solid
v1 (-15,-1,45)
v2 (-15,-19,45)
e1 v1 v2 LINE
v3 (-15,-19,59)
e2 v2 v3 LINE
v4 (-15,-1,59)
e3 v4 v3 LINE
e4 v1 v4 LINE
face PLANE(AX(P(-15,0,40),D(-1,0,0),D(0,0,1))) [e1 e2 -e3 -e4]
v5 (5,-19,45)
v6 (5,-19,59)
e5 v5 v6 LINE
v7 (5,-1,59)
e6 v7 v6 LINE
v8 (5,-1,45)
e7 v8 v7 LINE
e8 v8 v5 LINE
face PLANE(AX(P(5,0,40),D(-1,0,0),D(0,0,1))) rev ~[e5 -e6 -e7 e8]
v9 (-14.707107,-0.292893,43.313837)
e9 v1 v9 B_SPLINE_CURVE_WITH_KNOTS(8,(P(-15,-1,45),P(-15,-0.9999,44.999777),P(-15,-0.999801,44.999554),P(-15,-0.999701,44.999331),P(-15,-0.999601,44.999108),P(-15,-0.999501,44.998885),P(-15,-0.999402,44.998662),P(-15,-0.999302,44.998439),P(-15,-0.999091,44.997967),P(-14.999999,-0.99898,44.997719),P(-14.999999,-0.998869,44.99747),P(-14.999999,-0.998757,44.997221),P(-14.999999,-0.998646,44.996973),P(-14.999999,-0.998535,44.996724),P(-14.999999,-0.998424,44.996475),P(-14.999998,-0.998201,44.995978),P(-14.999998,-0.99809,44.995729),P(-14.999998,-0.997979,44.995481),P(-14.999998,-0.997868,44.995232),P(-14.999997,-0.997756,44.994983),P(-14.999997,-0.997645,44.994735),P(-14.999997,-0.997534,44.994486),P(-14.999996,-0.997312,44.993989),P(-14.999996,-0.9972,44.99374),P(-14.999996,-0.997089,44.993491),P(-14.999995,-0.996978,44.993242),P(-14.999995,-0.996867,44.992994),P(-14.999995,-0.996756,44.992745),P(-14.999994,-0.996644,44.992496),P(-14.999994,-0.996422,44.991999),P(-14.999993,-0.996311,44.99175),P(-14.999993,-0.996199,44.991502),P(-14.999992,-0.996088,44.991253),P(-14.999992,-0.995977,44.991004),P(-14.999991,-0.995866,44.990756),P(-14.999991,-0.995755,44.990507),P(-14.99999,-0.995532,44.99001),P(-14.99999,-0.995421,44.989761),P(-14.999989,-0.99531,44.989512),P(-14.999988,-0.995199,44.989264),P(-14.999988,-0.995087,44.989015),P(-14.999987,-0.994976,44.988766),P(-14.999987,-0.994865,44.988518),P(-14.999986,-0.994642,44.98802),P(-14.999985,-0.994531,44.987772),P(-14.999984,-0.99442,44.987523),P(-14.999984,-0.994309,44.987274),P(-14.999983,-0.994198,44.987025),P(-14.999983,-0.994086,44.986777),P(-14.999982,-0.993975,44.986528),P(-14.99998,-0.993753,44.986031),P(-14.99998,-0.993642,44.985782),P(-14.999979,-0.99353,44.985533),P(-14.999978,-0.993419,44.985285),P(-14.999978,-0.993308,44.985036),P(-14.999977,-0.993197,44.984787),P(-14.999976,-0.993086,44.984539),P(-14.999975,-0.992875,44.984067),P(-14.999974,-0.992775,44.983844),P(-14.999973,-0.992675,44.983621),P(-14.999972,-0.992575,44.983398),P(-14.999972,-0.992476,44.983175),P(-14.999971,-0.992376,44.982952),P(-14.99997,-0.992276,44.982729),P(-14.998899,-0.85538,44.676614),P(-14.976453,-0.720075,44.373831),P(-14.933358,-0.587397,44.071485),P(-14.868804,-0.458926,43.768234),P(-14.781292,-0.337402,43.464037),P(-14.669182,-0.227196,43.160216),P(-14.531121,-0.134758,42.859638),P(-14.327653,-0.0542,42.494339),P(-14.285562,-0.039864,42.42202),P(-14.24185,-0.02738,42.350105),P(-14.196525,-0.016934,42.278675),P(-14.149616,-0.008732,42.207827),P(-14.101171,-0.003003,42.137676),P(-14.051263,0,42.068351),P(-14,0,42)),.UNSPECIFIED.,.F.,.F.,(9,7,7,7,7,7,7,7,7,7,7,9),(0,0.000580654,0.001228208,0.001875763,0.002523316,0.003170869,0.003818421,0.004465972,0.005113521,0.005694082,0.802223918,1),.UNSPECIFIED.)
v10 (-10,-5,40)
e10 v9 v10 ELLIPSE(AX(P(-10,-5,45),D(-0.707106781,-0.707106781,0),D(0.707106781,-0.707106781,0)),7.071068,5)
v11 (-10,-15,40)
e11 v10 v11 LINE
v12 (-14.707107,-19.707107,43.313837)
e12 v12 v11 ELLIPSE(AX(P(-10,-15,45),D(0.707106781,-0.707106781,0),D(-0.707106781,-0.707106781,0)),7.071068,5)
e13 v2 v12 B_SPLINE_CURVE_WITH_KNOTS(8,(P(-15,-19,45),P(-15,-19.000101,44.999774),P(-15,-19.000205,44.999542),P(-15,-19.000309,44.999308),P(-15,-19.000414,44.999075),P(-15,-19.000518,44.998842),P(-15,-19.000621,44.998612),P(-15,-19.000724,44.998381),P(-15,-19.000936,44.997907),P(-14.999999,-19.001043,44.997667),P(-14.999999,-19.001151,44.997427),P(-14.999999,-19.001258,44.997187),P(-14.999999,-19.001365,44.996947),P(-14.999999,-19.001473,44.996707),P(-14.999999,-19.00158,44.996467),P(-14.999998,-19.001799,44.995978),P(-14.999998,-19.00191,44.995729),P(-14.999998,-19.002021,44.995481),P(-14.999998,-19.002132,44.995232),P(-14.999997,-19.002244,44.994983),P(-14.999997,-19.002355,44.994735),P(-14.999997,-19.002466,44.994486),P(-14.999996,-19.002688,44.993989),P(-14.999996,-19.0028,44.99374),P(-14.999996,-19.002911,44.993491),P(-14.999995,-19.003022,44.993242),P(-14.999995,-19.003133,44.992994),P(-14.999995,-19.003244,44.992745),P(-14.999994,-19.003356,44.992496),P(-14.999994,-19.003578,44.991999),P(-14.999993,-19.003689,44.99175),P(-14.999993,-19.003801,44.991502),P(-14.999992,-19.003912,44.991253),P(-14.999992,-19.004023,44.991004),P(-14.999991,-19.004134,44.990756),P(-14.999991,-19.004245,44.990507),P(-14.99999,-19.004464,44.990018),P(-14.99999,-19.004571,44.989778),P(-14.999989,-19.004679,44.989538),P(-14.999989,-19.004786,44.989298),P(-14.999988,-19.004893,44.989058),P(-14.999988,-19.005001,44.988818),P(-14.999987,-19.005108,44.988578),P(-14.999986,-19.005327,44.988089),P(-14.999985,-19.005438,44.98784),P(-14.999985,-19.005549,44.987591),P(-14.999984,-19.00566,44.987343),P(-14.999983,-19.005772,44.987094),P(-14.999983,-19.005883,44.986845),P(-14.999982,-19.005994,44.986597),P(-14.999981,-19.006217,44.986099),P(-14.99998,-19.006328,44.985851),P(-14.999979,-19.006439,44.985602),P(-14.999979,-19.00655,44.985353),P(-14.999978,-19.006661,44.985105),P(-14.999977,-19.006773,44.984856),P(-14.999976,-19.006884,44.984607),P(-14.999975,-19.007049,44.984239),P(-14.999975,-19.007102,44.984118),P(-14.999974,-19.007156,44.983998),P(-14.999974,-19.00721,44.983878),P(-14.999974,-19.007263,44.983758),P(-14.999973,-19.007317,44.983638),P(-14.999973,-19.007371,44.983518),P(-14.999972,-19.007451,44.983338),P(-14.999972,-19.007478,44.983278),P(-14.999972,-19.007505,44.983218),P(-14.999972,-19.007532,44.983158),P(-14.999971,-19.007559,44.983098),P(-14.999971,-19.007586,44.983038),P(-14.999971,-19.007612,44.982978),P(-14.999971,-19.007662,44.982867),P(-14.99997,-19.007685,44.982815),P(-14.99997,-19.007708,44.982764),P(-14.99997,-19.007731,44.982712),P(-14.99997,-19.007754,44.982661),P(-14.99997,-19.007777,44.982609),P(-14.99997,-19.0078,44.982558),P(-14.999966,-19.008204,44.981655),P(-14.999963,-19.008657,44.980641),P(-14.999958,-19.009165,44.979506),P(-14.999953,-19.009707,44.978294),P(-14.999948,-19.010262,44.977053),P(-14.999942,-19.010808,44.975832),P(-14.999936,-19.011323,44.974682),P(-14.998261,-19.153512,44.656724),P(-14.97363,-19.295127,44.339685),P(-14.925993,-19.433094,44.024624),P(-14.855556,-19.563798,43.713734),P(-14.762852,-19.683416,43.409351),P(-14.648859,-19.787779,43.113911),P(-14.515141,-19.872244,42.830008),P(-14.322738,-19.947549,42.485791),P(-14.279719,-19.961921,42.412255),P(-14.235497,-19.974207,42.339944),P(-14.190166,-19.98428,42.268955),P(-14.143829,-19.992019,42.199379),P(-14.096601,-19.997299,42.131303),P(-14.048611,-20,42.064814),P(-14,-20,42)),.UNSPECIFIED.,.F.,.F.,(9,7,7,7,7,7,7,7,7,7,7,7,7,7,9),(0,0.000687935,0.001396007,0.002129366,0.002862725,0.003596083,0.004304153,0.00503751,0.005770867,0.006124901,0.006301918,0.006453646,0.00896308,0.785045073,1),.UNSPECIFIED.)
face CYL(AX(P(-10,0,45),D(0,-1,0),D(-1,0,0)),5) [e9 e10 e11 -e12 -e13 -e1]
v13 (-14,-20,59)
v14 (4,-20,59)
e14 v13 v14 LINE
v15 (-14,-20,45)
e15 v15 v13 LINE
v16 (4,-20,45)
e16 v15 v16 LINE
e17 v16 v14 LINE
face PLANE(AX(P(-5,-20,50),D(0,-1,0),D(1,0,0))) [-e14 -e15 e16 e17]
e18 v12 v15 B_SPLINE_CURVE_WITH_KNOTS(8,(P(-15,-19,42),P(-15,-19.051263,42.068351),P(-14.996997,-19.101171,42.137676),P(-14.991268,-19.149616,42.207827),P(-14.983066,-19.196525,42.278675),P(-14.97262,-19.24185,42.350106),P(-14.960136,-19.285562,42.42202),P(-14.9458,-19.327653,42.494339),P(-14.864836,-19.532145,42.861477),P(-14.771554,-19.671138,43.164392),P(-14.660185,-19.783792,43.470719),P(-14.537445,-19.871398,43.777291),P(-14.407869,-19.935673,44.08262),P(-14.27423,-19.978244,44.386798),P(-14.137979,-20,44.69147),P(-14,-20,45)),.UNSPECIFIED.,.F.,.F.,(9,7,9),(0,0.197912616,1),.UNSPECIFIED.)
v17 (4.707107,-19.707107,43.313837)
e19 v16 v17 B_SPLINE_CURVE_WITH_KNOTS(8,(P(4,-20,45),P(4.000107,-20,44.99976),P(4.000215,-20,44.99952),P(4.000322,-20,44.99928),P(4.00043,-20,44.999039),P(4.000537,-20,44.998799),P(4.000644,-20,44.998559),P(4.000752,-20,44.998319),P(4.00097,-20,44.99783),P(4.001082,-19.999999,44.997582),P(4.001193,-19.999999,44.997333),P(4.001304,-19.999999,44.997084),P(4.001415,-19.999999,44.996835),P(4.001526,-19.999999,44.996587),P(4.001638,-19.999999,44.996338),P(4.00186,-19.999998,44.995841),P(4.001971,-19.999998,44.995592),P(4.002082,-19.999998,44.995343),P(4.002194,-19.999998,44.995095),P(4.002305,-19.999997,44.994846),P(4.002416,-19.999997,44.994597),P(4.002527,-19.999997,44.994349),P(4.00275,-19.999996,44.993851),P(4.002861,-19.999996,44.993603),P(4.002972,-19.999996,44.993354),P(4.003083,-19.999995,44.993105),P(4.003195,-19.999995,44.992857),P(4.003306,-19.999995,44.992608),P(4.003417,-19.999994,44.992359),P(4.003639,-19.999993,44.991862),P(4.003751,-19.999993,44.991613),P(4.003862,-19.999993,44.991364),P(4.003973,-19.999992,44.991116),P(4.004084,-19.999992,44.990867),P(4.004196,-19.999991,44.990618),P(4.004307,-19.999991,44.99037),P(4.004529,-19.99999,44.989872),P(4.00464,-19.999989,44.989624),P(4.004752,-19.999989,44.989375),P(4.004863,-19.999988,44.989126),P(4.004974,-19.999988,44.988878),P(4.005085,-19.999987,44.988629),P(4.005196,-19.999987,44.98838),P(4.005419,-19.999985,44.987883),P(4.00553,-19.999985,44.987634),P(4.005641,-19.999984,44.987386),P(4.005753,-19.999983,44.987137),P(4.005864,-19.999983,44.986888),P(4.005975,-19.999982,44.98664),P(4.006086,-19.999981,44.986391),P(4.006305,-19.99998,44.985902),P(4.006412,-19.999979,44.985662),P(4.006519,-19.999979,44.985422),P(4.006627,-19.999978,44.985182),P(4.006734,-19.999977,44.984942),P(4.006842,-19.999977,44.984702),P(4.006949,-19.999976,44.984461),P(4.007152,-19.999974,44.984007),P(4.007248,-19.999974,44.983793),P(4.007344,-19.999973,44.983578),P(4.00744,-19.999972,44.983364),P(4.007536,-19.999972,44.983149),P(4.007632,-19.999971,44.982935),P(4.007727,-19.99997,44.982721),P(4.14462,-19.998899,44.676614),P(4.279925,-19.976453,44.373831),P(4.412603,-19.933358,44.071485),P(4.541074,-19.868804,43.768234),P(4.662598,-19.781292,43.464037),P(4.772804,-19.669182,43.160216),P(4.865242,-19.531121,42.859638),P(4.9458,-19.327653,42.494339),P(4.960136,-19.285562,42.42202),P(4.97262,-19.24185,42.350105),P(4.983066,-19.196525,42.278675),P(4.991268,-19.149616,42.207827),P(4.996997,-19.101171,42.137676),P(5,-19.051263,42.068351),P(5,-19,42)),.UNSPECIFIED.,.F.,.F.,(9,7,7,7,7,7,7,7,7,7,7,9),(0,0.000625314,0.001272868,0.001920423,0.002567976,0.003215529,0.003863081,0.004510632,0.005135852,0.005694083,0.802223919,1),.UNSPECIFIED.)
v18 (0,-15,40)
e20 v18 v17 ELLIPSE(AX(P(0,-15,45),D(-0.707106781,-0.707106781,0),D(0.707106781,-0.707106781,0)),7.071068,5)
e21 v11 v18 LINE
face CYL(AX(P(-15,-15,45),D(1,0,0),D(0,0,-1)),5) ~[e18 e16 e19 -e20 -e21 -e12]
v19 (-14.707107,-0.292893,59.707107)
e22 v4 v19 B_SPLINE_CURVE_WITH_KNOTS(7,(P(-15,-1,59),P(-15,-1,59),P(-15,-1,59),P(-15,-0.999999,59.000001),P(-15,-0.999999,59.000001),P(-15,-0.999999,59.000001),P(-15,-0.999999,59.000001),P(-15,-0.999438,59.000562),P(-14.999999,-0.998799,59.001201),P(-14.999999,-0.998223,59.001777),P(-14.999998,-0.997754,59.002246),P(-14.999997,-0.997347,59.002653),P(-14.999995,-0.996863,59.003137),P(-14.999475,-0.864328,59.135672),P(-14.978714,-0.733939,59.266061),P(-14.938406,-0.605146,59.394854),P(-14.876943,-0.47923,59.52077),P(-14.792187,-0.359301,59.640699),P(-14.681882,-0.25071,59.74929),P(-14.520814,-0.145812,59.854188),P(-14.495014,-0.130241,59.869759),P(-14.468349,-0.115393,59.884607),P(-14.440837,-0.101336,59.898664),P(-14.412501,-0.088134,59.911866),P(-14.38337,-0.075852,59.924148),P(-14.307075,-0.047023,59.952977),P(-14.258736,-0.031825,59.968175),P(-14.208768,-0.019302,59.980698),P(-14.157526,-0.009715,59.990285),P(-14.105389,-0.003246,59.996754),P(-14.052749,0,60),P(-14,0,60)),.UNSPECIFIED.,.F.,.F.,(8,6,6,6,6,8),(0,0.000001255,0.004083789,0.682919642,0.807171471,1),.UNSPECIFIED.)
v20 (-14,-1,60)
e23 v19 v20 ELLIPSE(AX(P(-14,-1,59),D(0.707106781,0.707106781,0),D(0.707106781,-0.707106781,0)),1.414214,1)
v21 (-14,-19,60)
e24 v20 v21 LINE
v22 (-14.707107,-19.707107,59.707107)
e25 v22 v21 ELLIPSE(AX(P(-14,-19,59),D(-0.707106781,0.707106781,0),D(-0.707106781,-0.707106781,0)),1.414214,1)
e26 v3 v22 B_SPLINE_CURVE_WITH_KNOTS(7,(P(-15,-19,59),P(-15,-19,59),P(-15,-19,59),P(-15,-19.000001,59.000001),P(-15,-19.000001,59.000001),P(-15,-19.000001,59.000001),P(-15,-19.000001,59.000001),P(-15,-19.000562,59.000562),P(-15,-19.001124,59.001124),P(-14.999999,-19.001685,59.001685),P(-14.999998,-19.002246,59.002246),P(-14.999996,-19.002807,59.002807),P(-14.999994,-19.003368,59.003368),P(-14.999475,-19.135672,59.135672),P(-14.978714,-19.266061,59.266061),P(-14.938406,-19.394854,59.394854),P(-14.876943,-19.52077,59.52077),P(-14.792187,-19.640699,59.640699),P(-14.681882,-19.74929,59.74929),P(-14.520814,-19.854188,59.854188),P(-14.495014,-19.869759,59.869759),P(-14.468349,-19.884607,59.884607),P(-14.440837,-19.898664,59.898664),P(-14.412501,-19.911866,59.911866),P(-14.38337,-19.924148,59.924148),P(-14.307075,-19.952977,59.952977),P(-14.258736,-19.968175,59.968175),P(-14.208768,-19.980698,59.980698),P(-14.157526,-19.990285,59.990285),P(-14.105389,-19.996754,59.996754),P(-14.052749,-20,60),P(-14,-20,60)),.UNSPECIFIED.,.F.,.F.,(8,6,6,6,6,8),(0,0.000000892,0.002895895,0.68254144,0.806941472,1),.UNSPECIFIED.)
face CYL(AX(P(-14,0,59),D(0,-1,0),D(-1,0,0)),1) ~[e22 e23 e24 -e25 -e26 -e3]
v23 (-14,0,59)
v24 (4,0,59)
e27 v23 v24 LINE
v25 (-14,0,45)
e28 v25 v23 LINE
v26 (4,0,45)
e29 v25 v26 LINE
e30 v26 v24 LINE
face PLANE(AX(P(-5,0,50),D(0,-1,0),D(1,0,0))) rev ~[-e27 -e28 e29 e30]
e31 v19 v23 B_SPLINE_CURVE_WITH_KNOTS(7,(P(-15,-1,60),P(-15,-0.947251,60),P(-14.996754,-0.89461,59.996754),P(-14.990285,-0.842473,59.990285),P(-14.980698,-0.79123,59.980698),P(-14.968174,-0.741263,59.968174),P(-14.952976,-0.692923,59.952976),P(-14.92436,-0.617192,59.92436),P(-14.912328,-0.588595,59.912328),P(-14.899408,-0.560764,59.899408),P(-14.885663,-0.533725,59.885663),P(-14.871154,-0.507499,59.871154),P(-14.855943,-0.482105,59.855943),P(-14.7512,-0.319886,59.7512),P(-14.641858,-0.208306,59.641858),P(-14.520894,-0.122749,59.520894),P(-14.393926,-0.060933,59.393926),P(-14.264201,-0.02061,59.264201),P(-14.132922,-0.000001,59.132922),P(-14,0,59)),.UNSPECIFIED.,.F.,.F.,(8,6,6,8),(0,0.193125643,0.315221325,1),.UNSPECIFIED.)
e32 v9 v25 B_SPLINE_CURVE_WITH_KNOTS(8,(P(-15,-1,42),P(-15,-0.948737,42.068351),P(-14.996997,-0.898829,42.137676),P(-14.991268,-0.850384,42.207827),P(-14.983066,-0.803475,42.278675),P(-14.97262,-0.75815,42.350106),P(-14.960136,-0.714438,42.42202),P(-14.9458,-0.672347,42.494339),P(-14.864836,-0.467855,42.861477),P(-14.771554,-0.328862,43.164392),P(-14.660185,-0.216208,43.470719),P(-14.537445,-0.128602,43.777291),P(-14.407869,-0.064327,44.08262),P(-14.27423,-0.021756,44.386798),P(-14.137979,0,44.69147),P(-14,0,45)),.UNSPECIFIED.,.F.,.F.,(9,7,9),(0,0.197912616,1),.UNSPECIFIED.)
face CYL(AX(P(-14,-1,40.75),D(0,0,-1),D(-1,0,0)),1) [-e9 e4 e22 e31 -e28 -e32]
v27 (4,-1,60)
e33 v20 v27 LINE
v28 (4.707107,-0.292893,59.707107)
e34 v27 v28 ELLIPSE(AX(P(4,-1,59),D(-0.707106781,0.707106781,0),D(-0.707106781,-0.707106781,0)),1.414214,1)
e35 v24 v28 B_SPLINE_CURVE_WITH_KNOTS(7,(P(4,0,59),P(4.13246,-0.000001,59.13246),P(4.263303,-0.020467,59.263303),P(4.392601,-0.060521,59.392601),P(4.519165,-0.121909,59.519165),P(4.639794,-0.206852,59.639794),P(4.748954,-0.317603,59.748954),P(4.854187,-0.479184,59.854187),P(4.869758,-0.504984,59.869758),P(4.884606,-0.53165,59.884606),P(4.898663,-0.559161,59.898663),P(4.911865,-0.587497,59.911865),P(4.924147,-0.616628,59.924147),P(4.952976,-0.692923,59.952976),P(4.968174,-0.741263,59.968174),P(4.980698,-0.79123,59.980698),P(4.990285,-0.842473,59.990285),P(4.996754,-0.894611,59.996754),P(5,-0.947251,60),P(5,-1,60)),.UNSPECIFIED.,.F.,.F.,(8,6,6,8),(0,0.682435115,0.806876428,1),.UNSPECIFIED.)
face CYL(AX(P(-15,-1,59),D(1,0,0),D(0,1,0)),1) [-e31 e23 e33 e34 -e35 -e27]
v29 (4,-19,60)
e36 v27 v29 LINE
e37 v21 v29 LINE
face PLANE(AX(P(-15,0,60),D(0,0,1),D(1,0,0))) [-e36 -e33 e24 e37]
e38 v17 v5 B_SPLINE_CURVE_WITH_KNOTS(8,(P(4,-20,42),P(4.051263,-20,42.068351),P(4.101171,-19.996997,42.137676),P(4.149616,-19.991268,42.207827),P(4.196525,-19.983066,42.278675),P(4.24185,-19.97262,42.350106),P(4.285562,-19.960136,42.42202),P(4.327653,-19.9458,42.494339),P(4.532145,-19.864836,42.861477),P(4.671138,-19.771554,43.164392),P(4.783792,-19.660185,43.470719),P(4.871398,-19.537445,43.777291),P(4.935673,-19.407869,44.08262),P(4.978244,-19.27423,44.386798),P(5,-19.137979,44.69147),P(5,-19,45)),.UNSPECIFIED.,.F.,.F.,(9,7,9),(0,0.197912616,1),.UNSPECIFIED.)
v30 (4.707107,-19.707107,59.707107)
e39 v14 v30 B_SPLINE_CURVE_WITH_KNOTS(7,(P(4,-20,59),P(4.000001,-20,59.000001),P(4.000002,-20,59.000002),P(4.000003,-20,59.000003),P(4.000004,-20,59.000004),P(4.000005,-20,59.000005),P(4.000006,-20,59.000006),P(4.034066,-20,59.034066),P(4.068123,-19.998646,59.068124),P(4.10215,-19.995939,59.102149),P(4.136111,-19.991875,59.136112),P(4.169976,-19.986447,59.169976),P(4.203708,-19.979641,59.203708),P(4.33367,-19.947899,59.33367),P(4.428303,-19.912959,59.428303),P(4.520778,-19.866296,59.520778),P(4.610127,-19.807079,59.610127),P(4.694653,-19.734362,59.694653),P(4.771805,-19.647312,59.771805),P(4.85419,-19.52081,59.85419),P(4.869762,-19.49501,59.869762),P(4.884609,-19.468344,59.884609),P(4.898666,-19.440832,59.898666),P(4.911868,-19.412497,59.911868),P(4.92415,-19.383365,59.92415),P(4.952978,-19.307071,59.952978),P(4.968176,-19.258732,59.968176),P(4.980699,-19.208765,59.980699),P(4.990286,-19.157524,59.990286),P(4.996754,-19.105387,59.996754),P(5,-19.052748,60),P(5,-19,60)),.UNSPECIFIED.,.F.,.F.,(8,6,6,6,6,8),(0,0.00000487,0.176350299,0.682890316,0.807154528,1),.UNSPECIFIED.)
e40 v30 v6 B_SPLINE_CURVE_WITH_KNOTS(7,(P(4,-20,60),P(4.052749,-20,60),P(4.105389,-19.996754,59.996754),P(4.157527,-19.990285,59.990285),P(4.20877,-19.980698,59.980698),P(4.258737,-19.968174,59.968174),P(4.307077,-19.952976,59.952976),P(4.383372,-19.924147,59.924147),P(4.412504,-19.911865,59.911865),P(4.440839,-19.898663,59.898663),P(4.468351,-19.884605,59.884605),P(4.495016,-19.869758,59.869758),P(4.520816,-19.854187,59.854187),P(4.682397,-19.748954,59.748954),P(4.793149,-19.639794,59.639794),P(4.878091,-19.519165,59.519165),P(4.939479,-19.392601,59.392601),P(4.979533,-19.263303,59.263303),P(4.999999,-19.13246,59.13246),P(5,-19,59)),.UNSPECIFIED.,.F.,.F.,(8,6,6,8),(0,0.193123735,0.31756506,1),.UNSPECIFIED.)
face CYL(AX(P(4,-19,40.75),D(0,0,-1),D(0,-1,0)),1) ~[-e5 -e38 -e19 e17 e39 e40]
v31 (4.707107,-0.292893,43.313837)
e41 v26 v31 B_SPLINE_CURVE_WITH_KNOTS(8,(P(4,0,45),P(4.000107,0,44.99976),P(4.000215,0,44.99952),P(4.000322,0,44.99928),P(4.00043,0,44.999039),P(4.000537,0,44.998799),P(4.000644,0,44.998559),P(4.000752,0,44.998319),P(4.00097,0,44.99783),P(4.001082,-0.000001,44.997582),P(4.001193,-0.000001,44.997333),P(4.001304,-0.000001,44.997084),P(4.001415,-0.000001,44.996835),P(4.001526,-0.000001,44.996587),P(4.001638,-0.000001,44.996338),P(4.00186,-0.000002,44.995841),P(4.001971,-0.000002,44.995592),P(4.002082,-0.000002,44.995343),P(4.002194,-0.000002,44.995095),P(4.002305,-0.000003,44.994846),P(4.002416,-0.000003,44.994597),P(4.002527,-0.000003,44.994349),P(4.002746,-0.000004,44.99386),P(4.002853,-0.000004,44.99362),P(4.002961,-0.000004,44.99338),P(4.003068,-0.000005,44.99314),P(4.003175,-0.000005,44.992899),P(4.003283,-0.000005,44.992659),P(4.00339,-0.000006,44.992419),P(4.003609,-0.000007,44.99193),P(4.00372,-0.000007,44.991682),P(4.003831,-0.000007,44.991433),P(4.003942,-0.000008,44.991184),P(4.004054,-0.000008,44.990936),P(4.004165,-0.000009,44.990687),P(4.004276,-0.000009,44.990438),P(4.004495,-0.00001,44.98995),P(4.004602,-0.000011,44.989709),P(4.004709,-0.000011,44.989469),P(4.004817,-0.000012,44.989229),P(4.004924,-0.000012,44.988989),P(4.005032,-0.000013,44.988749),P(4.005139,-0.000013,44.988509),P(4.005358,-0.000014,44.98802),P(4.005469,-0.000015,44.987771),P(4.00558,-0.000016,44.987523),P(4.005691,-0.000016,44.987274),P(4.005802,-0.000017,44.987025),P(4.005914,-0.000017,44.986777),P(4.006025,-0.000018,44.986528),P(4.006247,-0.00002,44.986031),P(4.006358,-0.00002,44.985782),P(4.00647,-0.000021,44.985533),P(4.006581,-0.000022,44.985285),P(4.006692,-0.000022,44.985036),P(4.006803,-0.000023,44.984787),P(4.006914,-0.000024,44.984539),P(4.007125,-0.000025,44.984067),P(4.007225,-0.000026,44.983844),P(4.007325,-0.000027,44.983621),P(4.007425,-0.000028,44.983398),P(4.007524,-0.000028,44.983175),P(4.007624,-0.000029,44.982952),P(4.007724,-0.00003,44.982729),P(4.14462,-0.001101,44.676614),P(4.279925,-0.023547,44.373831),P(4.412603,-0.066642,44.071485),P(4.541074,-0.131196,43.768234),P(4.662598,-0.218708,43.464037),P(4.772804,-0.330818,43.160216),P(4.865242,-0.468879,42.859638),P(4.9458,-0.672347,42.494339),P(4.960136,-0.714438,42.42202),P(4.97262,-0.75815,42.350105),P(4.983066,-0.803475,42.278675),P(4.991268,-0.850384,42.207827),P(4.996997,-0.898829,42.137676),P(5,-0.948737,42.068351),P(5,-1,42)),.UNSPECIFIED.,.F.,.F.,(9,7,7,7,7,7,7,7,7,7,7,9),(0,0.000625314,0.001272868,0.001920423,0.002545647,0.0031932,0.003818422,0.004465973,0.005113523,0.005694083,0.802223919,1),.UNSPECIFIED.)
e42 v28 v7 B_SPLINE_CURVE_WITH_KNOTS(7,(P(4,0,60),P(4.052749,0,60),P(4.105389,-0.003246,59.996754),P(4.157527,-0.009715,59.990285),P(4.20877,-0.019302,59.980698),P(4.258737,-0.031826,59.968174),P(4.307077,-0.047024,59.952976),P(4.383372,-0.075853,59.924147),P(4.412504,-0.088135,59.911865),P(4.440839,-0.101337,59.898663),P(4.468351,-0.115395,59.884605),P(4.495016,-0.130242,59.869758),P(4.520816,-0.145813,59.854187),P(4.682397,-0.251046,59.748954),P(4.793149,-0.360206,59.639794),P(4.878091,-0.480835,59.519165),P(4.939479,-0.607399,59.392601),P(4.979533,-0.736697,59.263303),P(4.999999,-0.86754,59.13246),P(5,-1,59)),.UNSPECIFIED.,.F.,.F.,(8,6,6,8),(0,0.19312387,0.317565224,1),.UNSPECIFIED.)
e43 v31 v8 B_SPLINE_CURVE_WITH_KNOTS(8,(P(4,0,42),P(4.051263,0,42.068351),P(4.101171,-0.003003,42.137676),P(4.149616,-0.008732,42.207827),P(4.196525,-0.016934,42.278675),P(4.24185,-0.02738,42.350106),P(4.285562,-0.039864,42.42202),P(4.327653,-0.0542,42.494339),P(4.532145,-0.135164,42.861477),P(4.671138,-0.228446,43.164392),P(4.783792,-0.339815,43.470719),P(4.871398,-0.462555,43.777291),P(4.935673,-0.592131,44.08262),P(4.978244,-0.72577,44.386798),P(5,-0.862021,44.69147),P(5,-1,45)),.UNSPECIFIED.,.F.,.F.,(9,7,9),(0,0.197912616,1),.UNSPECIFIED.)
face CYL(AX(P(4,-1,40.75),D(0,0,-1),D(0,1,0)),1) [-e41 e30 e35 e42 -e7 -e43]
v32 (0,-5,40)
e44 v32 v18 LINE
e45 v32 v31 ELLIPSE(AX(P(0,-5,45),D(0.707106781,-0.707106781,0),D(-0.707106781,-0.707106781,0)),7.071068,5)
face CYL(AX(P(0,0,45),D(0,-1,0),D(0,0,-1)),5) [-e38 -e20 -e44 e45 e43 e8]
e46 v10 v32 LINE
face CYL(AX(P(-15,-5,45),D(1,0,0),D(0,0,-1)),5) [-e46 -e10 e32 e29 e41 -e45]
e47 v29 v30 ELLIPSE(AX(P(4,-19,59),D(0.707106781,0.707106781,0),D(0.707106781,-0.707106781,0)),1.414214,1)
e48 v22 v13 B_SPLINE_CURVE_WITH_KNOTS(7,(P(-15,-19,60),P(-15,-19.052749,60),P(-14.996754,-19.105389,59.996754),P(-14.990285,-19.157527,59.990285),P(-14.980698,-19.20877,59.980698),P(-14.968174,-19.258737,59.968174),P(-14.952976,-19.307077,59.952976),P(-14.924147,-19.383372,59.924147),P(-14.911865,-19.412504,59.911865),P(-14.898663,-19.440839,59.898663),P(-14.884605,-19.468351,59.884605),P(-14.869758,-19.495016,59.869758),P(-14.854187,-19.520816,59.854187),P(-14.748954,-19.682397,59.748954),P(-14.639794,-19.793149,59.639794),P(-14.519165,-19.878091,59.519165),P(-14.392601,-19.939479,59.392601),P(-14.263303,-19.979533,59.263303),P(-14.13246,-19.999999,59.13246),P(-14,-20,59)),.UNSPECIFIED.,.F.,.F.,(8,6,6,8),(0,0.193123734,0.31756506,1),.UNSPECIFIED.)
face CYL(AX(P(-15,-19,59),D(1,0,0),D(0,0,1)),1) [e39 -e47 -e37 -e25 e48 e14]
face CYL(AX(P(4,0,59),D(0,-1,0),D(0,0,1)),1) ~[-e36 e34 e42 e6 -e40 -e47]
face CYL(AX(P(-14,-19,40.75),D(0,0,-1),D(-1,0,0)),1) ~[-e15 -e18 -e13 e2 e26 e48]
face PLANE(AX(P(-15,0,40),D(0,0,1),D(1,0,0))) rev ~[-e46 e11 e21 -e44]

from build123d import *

# Parameters (mm, degrees)
F0_W        = 20
F0_H        = 20
F1_DEPTH    = 20
F2_R        = 5
F3_R        = 1
F4_T1_DEPTH = 20.75
F5_T1_DEPTH = 20.75


# Not quite as in the source:
# - a fillet or chamfer that OpenCascade refuses, or shapes differently, is made with other operations: its cross-section is extruded or revolved along the edge and cut away or added


with BuildPart() as f1:
    # F0 (on Front) → F1 (new body)
    with BuildSketch(Plane.XZ):
        with Locations((-5, 50)):
            Rectangle(F0_W, F0_H)
    extrude(amount=F1_DEPTH)

    # F2
    f2_edges = [f1.edges().sort_by_distance(p)[0] for p in [
        (-15, -10, 40),
        (5, -10, 40),
        (-5, 0, 40),
        (-5, -20, 40),
    ]]
    fillet(f2_edges, radius=F2_R)

    # F3
    f3_edges = [f1.edges().sort_by_distance(p)[0] for p in [
        (5, -10, 60),
        (-15, -10, 60),
        (-5, 0, 60),
        (-5, -20, 60),
    ]]
    fillet(f3_edges, radius=F3_R)

    # F4: fillet of radius 1 on 4 edges, made by hand

    # F4_s2 → F4_t1 (cut)
    with BuildSketch(Plane.XY.offset(40.75)):
        with BuildLine():
            ThreePointArc((4, 0), (4.7071067812, -0.2928932188), (5, -1))
            Line((5, -1), (5, 0))
            Line((5, 0), (4, 0))
        make_face()
        with BuildLine():
            ThreePointArc((4, -20), (4.7071067812, -19.7071067812), (5, -19))
            Line((5, -19), (5, -20))
            Line((5, -20), (4, -20))
        make_face()
    extrude(amount=F4_T1_DEPTH, mode=Mode.SUBTRACT)

    # F5: fillet of radius 1 on 4 edges, made by hand

    # F5_s2 → F5_t1 (cut)
    with BuildSketch(Plane.XY.offset(40.75)):
        with BuildLine():
            ThreePointArc((-15, -1), (-14.7071067812, -0.2928932188), (-14, 0))
            Line((-14, 0), (-15, 0))
            Line((-15, 0), (-15, -1))
        make_face()
        with BuildLine():
            ThreePointArc((-15, -19), (-14.7071067812, -19.7071067812), (-14, -20))
            Line((-14, -20), (-15, -20))
            Line((-15, -20), (-15, -19))
        make_face()
    extrude(amount=F5_T1_DEPTH, mode=Mode.SUBTRACT)


solid = f1.part
